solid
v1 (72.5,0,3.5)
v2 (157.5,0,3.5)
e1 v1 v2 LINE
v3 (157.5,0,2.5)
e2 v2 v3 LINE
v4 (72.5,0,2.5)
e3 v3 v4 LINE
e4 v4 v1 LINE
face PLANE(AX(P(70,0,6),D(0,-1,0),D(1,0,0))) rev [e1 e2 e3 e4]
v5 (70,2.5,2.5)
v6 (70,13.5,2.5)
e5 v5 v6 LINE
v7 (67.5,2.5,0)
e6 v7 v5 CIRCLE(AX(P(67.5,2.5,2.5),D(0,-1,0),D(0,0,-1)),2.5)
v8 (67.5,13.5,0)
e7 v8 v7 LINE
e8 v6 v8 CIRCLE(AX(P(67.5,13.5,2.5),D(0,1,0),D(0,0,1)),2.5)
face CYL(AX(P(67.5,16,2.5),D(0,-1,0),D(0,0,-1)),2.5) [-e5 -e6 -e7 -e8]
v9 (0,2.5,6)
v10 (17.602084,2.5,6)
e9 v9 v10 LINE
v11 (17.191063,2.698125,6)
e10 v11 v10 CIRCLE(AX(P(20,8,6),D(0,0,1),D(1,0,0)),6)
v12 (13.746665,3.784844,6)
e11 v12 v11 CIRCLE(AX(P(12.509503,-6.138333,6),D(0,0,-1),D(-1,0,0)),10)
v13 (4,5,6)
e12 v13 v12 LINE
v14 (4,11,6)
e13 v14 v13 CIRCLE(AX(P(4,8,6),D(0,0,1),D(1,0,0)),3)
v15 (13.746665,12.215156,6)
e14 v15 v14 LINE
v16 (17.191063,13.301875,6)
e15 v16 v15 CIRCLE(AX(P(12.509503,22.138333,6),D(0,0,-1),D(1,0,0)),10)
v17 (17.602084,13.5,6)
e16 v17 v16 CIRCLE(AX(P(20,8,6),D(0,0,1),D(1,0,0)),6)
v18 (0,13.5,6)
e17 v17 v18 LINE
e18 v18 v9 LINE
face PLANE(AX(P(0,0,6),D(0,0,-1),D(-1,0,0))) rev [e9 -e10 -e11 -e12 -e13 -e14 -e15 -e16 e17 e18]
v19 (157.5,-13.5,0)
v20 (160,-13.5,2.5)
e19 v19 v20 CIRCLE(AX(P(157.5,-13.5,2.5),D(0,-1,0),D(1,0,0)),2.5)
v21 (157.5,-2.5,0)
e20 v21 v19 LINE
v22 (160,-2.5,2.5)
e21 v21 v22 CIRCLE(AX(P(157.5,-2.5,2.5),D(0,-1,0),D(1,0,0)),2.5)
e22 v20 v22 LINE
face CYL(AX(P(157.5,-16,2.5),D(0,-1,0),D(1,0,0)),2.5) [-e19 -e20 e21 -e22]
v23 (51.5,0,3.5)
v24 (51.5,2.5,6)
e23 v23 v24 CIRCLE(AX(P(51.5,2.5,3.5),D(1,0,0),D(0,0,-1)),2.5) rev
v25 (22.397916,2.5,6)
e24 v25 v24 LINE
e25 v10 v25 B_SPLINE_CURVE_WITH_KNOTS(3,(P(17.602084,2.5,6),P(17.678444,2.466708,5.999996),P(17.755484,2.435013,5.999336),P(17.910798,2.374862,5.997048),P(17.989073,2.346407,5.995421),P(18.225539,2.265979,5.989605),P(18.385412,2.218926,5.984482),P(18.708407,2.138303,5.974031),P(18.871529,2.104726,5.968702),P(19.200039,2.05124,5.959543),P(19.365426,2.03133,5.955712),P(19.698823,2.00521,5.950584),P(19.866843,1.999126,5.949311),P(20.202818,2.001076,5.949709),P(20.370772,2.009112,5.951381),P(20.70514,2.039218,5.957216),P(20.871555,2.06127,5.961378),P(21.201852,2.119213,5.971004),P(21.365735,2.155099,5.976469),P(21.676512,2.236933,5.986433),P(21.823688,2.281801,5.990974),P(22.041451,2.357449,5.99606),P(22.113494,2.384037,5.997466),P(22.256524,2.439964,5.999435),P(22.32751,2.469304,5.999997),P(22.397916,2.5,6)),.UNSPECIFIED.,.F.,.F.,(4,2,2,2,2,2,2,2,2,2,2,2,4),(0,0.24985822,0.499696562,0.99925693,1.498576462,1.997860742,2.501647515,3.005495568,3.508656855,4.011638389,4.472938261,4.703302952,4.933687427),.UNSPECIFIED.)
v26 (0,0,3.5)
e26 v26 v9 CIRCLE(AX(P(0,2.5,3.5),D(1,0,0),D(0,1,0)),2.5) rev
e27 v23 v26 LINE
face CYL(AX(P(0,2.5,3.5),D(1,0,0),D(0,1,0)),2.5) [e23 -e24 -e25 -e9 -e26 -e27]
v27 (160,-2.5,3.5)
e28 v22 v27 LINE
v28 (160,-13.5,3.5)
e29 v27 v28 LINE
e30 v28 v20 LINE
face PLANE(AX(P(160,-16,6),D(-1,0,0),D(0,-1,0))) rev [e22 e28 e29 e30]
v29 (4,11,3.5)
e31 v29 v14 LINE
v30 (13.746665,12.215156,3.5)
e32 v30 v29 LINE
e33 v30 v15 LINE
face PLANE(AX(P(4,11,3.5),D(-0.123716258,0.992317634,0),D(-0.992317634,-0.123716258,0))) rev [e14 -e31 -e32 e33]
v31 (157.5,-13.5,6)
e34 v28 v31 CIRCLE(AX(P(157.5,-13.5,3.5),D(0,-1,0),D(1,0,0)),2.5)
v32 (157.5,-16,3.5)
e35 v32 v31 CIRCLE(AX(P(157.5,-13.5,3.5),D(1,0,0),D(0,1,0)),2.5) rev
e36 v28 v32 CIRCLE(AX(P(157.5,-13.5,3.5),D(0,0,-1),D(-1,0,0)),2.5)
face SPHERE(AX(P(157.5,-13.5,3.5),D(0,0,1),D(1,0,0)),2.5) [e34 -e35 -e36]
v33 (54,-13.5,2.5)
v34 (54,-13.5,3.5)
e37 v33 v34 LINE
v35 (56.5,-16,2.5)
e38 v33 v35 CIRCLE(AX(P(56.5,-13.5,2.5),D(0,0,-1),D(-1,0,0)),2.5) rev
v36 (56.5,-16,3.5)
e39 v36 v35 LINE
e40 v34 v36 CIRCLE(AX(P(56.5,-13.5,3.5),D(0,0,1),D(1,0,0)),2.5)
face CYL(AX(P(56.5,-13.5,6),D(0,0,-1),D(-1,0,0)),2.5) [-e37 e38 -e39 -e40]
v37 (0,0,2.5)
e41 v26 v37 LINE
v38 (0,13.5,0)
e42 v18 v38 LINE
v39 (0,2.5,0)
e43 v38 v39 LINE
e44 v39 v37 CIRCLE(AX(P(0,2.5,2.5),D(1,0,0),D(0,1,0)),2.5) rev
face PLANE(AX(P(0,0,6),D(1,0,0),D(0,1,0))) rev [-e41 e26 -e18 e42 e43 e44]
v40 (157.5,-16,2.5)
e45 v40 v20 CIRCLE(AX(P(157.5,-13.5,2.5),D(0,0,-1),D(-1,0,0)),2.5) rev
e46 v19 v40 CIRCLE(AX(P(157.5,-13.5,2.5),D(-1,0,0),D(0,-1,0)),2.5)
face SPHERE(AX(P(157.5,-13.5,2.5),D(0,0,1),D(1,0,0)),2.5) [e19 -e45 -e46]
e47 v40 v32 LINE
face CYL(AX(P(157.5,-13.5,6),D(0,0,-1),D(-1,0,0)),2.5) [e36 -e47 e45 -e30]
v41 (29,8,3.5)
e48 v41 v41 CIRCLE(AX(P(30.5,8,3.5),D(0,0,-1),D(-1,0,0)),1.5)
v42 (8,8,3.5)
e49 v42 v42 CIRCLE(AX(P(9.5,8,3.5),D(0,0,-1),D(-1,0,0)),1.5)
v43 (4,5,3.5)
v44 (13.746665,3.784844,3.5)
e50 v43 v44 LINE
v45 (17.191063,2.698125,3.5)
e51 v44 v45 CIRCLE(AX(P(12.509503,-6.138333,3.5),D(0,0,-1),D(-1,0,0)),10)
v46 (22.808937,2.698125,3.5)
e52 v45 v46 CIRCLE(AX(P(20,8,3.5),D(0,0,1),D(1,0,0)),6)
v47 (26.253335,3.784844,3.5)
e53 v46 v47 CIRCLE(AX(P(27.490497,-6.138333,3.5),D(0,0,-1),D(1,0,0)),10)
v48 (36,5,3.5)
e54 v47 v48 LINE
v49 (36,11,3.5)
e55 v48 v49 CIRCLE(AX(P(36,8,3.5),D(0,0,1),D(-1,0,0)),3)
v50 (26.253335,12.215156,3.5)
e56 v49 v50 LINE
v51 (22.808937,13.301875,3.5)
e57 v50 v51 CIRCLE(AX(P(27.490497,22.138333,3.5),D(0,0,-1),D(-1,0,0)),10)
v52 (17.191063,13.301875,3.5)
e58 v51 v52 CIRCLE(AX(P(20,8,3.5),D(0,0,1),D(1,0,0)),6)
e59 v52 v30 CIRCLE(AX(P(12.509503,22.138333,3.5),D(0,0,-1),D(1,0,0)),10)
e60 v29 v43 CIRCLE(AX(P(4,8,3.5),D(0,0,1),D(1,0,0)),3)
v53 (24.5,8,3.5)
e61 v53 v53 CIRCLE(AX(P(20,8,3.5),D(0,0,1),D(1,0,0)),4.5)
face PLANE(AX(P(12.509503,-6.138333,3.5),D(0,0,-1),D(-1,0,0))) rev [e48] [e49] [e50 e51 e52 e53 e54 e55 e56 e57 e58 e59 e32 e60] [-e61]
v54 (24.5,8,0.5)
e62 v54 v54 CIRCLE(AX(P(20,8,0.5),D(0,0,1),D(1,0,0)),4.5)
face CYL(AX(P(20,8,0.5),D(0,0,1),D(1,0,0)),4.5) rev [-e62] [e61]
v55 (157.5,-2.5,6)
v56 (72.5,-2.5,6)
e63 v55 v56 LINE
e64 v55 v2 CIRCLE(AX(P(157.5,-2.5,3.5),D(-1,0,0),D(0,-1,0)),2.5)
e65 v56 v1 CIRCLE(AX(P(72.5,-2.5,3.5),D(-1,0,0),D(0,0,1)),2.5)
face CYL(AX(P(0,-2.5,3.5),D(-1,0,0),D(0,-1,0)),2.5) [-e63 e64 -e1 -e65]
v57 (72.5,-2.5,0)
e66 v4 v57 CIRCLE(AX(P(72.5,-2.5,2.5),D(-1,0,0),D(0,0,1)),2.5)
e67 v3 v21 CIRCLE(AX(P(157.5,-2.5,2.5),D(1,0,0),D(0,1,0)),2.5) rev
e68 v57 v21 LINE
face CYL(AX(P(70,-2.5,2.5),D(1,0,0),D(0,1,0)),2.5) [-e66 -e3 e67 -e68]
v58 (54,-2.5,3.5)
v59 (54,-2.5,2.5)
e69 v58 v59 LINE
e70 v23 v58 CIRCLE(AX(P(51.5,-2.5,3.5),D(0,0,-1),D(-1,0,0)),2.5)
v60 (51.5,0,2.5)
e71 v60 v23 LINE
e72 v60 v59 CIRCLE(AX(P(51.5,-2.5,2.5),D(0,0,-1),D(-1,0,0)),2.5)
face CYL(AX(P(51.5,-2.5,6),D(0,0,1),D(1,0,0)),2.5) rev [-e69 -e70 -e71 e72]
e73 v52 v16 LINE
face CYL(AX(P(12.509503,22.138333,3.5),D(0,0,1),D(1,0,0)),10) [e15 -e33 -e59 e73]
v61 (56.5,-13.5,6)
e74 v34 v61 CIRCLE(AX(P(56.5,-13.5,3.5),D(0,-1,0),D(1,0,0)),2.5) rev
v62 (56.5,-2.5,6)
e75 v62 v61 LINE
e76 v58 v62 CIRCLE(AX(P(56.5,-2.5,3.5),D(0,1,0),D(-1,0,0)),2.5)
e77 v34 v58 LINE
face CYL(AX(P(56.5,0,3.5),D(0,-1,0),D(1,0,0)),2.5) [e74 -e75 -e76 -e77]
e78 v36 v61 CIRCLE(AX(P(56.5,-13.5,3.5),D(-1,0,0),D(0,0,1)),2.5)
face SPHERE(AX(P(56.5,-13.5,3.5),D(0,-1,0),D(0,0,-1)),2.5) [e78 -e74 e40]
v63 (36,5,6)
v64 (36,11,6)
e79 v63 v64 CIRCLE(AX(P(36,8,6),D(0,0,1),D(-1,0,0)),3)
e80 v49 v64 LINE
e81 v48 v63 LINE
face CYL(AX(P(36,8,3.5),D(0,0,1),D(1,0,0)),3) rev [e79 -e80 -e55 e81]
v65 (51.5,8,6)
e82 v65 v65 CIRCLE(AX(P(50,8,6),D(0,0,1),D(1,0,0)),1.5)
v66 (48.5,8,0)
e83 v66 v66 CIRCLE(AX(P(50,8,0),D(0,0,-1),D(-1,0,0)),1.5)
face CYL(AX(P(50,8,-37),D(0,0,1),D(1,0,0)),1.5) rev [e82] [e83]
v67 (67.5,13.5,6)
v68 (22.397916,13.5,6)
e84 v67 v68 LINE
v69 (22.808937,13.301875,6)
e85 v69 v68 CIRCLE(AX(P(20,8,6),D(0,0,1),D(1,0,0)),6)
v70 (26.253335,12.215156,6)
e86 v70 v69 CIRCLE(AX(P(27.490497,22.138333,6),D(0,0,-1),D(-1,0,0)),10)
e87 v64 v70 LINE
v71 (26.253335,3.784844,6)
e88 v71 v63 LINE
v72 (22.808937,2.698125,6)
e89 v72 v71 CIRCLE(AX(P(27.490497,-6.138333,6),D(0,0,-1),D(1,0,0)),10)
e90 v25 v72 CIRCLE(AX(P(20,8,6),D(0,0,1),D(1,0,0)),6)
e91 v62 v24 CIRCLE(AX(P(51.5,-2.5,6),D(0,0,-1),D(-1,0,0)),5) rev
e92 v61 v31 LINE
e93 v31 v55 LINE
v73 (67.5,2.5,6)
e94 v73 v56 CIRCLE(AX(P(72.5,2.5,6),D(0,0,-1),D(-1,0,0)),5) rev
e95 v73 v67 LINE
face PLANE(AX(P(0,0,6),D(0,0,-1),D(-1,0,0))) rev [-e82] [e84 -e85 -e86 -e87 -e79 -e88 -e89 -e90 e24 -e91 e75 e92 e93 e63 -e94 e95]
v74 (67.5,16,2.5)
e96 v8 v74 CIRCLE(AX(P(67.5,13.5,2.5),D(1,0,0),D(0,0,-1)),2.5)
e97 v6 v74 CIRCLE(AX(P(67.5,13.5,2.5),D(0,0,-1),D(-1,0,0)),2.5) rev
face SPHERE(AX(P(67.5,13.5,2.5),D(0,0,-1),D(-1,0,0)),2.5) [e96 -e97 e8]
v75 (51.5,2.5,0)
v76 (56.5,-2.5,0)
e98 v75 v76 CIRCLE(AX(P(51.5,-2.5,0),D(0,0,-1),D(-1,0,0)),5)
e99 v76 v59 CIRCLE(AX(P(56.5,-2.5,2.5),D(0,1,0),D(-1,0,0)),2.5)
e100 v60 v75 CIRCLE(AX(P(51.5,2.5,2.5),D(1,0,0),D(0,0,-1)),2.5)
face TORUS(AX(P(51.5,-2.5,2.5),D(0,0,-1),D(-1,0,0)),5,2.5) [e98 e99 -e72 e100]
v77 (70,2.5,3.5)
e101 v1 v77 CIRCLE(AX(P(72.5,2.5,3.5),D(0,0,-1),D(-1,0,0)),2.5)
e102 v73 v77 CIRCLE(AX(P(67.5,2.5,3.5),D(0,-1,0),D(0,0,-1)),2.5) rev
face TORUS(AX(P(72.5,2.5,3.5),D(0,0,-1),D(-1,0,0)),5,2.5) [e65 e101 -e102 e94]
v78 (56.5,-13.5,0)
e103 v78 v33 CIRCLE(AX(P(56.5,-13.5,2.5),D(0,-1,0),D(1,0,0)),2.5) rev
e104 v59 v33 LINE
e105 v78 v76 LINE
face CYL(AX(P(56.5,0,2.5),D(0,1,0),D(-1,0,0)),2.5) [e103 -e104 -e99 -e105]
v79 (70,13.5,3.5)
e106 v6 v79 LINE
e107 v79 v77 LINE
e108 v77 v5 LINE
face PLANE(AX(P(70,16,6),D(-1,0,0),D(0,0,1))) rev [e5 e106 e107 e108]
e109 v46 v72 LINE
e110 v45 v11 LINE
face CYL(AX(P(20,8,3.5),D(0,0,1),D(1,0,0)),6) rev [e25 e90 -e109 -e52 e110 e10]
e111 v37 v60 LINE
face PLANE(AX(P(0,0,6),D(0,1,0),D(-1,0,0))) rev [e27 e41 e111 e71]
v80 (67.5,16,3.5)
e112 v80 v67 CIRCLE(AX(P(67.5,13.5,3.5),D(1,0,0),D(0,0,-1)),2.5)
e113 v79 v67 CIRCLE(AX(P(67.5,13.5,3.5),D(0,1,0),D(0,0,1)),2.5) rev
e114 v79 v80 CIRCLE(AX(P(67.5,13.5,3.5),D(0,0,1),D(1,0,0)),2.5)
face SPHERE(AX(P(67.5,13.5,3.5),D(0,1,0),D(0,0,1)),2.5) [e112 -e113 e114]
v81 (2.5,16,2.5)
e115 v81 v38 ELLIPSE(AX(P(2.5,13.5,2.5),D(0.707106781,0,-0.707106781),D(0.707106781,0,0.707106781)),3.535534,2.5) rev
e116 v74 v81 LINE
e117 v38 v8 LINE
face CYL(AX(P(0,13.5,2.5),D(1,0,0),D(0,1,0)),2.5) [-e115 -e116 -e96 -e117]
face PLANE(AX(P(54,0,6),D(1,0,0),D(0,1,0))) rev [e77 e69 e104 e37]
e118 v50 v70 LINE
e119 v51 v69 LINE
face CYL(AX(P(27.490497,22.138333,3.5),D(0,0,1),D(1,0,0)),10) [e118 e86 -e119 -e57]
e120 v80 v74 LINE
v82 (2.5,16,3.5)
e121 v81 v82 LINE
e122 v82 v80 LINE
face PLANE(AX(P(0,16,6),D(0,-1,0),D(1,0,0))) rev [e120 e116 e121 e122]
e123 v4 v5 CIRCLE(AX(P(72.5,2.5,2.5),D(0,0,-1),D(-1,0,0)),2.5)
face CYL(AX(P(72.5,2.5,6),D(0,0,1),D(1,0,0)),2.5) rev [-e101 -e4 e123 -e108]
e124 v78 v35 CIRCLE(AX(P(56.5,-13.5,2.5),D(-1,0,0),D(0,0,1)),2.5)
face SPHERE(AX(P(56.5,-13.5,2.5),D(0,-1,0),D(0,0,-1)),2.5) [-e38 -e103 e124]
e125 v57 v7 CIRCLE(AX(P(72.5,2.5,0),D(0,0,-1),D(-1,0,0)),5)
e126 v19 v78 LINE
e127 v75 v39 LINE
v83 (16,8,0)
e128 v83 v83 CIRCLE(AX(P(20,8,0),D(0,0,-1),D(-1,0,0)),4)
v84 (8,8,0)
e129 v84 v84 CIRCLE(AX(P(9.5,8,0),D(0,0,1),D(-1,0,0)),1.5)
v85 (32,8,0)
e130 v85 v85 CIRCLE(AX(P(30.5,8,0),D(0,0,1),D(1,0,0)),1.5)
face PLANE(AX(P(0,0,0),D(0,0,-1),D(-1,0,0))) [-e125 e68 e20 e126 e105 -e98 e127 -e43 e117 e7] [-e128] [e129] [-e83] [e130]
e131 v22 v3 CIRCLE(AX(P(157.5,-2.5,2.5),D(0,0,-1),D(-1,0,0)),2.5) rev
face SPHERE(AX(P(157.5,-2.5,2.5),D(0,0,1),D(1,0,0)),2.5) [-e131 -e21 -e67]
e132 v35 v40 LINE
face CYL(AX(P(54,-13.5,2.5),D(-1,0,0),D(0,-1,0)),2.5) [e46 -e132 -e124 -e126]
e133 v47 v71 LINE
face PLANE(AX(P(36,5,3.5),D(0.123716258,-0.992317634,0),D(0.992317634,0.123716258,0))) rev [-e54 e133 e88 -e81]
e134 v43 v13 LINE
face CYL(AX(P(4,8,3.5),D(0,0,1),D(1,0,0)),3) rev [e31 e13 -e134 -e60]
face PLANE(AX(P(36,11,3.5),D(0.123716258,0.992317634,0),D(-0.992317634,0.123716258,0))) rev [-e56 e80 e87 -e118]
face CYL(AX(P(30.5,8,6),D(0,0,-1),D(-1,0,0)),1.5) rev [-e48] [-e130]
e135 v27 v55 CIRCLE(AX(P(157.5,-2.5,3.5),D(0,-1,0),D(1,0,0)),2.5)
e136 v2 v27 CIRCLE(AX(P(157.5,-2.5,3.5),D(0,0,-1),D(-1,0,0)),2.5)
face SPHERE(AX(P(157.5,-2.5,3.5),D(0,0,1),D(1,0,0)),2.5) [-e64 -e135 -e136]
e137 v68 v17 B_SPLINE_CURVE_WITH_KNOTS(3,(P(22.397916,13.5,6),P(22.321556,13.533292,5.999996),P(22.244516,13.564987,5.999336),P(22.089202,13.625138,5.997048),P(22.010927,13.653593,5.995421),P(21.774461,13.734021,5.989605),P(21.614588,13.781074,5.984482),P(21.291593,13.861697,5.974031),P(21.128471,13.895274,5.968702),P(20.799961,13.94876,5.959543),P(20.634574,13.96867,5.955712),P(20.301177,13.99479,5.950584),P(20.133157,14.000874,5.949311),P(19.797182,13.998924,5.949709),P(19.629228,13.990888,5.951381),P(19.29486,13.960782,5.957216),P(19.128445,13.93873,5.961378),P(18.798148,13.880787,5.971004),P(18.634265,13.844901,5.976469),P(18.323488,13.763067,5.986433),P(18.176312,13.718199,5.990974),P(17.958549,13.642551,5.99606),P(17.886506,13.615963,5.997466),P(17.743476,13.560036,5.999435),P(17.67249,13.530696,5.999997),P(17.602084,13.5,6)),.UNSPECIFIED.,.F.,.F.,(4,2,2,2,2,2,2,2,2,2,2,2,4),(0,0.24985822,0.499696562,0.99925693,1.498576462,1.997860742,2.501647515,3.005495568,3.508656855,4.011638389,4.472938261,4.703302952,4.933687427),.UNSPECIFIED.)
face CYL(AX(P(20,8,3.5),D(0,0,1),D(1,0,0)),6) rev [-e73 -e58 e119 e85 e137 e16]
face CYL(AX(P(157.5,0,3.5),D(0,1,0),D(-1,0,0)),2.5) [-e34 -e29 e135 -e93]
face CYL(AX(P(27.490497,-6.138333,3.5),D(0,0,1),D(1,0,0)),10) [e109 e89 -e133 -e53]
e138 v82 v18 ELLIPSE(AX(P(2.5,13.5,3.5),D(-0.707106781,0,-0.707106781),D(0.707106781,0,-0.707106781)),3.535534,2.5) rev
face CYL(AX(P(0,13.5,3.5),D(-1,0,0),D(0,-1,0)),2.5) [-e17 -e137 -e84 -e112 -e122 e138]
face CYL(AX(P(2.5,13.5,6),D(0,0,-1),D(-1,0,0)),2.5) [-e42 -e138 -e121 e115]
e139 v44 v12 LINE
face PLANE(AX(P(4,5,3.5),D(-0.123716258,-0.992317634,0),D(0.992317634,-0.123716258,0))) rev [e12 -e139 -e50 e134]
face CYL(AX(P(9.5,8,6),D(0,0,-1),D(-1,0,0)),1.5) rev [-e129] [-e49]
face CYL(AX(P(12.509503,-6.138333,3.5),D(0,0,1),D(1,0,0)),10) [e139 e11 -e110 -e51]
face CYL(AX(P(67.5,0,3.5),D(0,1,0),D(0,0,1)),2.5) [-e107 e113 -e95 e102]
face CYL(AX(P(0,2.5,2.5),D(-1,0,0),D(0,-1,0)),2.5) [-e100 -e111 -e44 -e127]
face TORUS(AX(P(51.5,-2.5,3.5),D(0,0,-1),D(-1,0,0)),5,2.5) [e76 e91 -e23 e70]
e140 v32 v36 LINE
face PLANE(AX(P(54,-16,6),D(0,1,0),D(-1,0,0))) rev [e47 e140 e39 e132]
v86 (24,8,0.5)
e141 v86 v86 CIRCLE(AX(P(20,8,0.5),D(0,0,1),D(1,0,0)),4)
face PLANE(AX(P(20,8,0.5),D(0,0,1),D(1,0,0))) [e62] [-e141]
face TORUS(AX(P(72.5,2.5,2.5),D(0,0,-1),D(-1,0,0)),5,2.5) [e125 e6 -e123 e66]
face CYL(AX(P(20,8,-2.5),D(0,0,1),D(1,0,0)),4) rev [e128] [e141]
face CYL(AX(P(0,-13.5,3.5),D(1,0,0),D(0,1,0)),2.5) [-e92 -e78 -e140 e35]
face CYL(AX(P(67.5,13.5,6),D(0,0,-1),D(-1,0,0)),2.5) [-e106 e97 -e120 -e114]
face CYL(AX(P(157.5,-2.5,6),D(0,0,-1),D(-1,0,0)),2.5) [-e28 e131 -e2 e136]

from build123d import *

# Parameters (mm, degrees)
SKETCH_1_R          = 1.5
EXTRUDE_1_DEPTH     = 6
CUT_EXTRUDE_3_DEPTH = 2.5
SKETCH_5_R          = 4.5
CUT_EXTRUDE_4_DEPTH = 3
SKETCH_6_R          = 4
CUT_EXTRUDE_5_DEPTH = 3
SKETCH_7_R          = 1.5
CUT_EXTRUDE_6_DEPTH = 43
FILLET_1_R          = 2.5
FILLET_2_R          = 2.5


with BuildPart() as part:
    # Эскиз1 → Бобышка-Вытянуть1 (new body)
    with BuildSketch(Plane.XY):
        Polygon((0, 0), (0, 16), (70, 16), (70, 0), (160, 0), (160, -16), (54, -16), (54, 0), align=None)
        with Locations((20, 8)):
            Circle(SKETCH_1_R, mode=Mode.SUBTRACT)
        with Locations((30.5, 8)):
            Circle(SKETCH_1_R, mode=Mode.SUBTRACT)
        with Locations(Location((9.5, 8, 0), (0, 0, 180))):
            Circle(SKETCH_1_R, mode=Mode.SUBTRACT)
    extrude(amount=EXTRUDE_1_DEPTH)

    # Эскиз4 → Вырез-Вытянуть3 (cut)
    with BuildSketch(Plane.XY.offset(6)):
        with BuildLine():
            Line((4, 11), (13.746665091, 12.215156208))
            ThreePointArc((13.746665091, 12.215156208), (15.51833306, 12.60172211), (17.191063441, 13.301874707))
            ThreePointArc((17.191063441, 13.301874707), (20, 14), (22.808936559, 13.301874707))
            ThreePointArc((22.808936559, 13.301874707), (24.48166694, 12.60172211), (26.253334909, 12.215156208))
            Line((26.253334909, 12.215156208), (36, 11))
            ThreePointArc((36, 11), (39, 8), (36, 5))
            Line((36, 5), (26.253334909, 3.784843792))
            ThreePointArc((26.253334909, 3.784843792), (24.48166694, 3.39827789), (22.808936559, 2.698125293))
            ThreePointArc((22.808936559, 2.698125293), (20, 2), (17.191063441, 2.698125293))
            ThreePointArc((17.191063441, 2.698125293), (15.51833306, 3.39827789), (13.746665091, 3.784843792))
            Line((13.746665091, 3.784843792), (4, 5))
            ThreePointArc((4, 5), (1, 8), (4, 11))
        make_face()
    extrude(amount=-CUT_EXTRUDE_3_DEPTH, mode=Mode.SUBTRACT)

    # Эскиз5 → Вырез-Вытянуть4 (cut)
    with BuildSketch(Plane.XY.offset(3.5)):
        with Locations((20, 8)):
            Circle(SKETCH_5_R)
    extrude(amount=-CUT_EXTRUDE_4_DEPTH, mode=Mode.SUBTRACT)

    # Эскиз6 → Вырез-Вытянуть5 (cut)
    with BuildSketch(Plane.XY.offset(0.5)):
        with Locations((20, 8)):
            Circle(SKETCH_6_R)
    extrude(amount=-CUT_EXTRUDE_5_DEPTH, mode=Mode.SUBTRACT)

    # Эскиз7 → Вырез-Вытянуть6 (cut)
    with BuildSketch(Plane.XY.offset(6)):
        with Locations((50, 8)):
            Circle(SKETCH_7_R)
        with Locations((80, 8)):
            Circle(SKETCH_7_R)
        with Locations((110, 8)):
            Circle(SKETCH_7_R)
        with Locations((140, 8)):
            Circle(SKETCH_7_R)
        with Locations((170, 8)):
            Circle(SKETCH_7_R)
    extrude(amount=-CUT_EXTRUDE_6_DEPTH, mode=Mode.SUBTRACT)

    # Скругление1
    # the kernel refuses this fillet: 2.5 mm, written as the material it adds along each edge
    with BuildSketch(Plane(origin=(70, 0, 0), x_dir=(0, 1, 0), z_dir=(0, 0, 1))) as fillet_1_piece_1:
        with BuildLine():
            CenterArc((FILLET_1_R, -FILLET_1_R), FILLET_1_R, 90, 90)
            Line((0, -FILLET_1_R), (0, 0))
            Line((0, 0), (FILLET_1_R, 0))
        make_face()
    extrude(amount=6)
    with BuildSketch(Plane(origin=(54, 0, 0), x_dir=(-1, 0, 0), z_dir=(0, 0, 1))) as fillet_1_piece_2:
        with BuildLine():
            CenterArc((FILLET_1_R, FILLET_1_R), FILLET_1_R, 180, 90)
            Line((0, FILLET_1_R), (0, 0))
            Line((0, 0), (FILLET_1_R, 0))
        make_face()
    extrude(amount=6)
    # the kernel refuses this fillet: 2.5 mm, written as the material it takes off along each edge
    with BuildSketch(Plane(origin=(56.5, -13.5, 2.5), x_dir=(0, 0, -1), z_dir=(0, -1, 0))) as fillet_1_2_piece_1_section:
        Polygon((0, 0), (FILLET_1_R, 0), (FILLET_1_R, -FILLET_1_R), (0, -FILLET_1_R), align=None)
    fillet_1_2_piece_1 = extrude(amount=FILLET_1_R, mode=Mode.PRIVATE)
    fillet_1_2_piece_1 = fillet_1_2_piece_1 - Plane(origin=(56.5, -13.5, 2.5), x_dir=(0.7071067811865475, 0, 0.7071067811865475), z_dir=(0, -1, 0)) * Sphere(FILLET_1_R, mode=Mode.PRIVATE)
    add(fillet_1_2_piece_1, mode=Mode.SUBTRACT)
    with BuildSketch(Plane(origin=(56.5, -13.5, 3.5), x_dir=(0, 0, 1), z_dir=(0, -1, 0))) as fillet_1_2_piece_2_section:
        Polygon((0, 0), (FILLET_1_R, 0), (FILLET_1_R, FILLET_1_R), (0, FILLET_1_R), align=None)
    fillet_1_2_piece_2 = extrude(amount=FILLET_1_R, mode=Mode.PRIVATE)
    fillet_1_2_piece_2 = fillet_1_2_piece_2 - Plane(origin=(56.5, -13.5, 3.5), x_dir=(0.7071067811865475, 0, -0.7071067811865475), z_dir=(0, -1, 0)) * Sphere(FILLET_1_R, mode=Mode.PRIVATE)
    add(fillet_1_2_piece_2, mode=Mode.SUBTRACT)
    with BuildSketch(Plane(origin=(67.5, 13.5, 2.5), x_dir=(0, 0, -1), z_dir=(0, 1, 0))) as fillet_1_2_piece_3_section:
        Polygon((0, 0), (FILLET_1_R, 0), (FILLET_1_R, -FILLET_1_R), (0, -FILLET_1_R), align=None)
    fillet_1_2_piece_3 = extrude(amount=FILLET_1_R, mode=Mode.PRIVATE)
    fillet_1_2_piece_3 = fillet_1_2_piece_3 - Plane(origin=(67.5, 13.5, 2.5), x_dir=(-0.7071067811865475, 0, 0.7071067811865475), z_dir=(0, 1, 0)) * Sphere(FILLET_1_R, mode=Mode.PRIVATE)
    add(fillet_1_2_piece_3, mode=Mode.SUBTRACT)
    with BuildSketch(Plane(origin=(67.5, 13.5, 3.5), x_dir=(0, 0, 1), z_dir=(0, 1, 0))) as fillet_1_2_piece_4_section:
        Polygon((0, 0), (FILLET_1_R, 0), (FILLET_1_R, FILLET_1_R), (0, FILLET_1_R), align=None)
    fillet_1_2_piece_4 = extrude(amount=FILLET_1_R, mode=Mode.PRIVATE)
    fillet_1_2_piece_4 = fillet_1_2_piece_4 - Plane(origin=(67.5, 13.5, 3.5), x_dir=(-0.7071067811865475, 0, -0.7071067811865475), z_dir=(0, 1, 0)) * Sphere(FILLET_1_R, mode=Mode.PRIVATE)
    add(fillet_1_2_piece_4, mode=Mode.SUBTRACT)
    with BuildSketch(Plane(origin=(166.25, -16, 0), x_dir=(0, 1, 0), z_dir=(-1, 0, 0))) as fillet_1_2_piece_5:
        with BuildLine():
            CenterArc((FILLET_1_R, -FILLET_1_R), FILLET_1_R, 90, 90)
            Line((0, -FILLET_1_R), (0, 0))
            Line((0, 0), (FILLET_1_R, 0))
        make_face()
    extrude(amount=109.75, mode=Mode.SUBTRACT)
    with BuildSketch(Plane(origin=(54, -13.5, 0), x_dir=(1, 0, 0), z_dir=(0, 1, 0)), Plane(origin=(70, 13.5, 0), x_dir=(-1, 0, 0), z_dir=(0, -1, 0))) as fillet_1_2_piece_6:
        with BuildLine():
            CenterArc((FILLET_1_R, -FILLET_1_R), FILLET_1_R, 90, 90)
            Line((0, -FILLET_1_R), (0, 0))
            Line((0, 0), (FILLET_1_R, 0))
        make_face()
    extrude(amount=11, mode=Mode.SUBTRACT)
    with BuildSketch(Plane(origin=(51.5, 0, 0), x_dir=(0, 0, 1), z_dir=(-1, 0, 0))) as fillet_1_2_piece_7:
        with BuildLine():
            CenterArc((FILLET_1_R, FILLET_1_R), FILLET_1_R, 180, 90)
            Line((0, FILLET_1_R), (0, 0))
            Line((0, 0), (FILLET_1_R, 0))
        make_face()
    extrude(amount=57.75, mode=Mode.SUBTRACT)
    with BuildSketch(Plane(origin=(166.25, -16, 6), x_dir=(0, 1, 0), z_dir=(-1, 0, 0))) as fillet_1_2_piece_8:
        with BuildLine():
            CenterArc((FILLET_1_R, FILLET_1_R), FILLET_1_R, 180, 90)
            Line((0, FILLET_1_R), (0, 0))
            Line((0, 0), (FILLET_1_R, 0))
        make_face()
    extrude(amount=109.75, mode=Mode.SUBTRACT)
    with BuildSketch(Plane(origin=(0, 16, -6.25), x_dir=(0, -1, 0), z_dir=(0, 0, 1)), Plane(origin=(160, 0, -6.25), x_dir=(-1, 0, 0), z_dir=(0, 0, 1))) as fillet_1_2_piece_9:
        with BuildLine():
            CenterArc((FILLET_1_R, FILLET_1_R), FILLET_1_R, 180, 90)
            Line((0, FILLET_1_R), (0, 0))
            Line((0, 0), (FILLET_1_R, 0))
        make_face()
    extrude(amount=18.5, mode=Mode.SUBTRACT)
    with BuildSketch(Plane(origin=(70, 16, 2.5), x_dir=(-1, 0, 0), z_dir=(0, 0, 1))) as fillet_1_2_piece_10:
        with BuildLine():
            CenterArc((FILLET_1_R, FILLET_1_R), FILLET_1_R, 180, 90)
            Line((0, FILLET_1_R), (0, 0))
            Line((0, 0), (FILLET_1_R, 0))
        make_face()
    extrude(amount=1, mode=Mode.SUBTRACT)
    with BuildSketch(Plane(origin=(160, -16, -6.25), x_dir=(-1, 0, 0), z_dir=(0, 0, 1))) as fillet_1_2_piece_11:
        with BuildLine():
            CenterArc((FILLET_1_R, -FILLET_1_R), FILLET_1_R, 90, 90)
            Line((0, -FILLET_1_R), (0, 0))
            Line((0, 0), (FILLET_1_R, 0))
        make_face()
    extrude(amount=18.5, mode=Mode.SUBTRACT)
    with BuildSketch(Plane(origin=(54, -16, 2.5), x_dir=(0, 1, 0), z_dir=(0, 0, 1))) as fillet_1_2_piece_12:
        with BuildLine():
            CenterArc((FILLET_1_R, -FILLET_1_R), FILLET_1_R, 90, 90)
            Line((0, -FILLET_1_R), (0, 0))
            Line((0, 0), (FILLET_1_R, 0))
        make_face()
    extrude(amount=1, mode=Mode.SUBTRACT)
    with BuildSketch(Plane(origin=(72.5, 0, 6), x_dir=(0, -1, 0), z_dir=(1, 0, 0))) as fillet_1_2_piece_13:
        with BuildLine():
            CenterArc((FILLET_1_R, FILLET_1_R), FILLET_1_R, 180, 90)
            Line((0, FILLET_1_R), (0, 0))
            Line((0, 0), (FILLET_1_R, 0))
        make_face()
    extrude(amount=93.75, mode=Mode.SUBTRACT)
    with BuildSketch(Plane(origin=(70, 13.5, 6), x_dir=(-1, 0, 0), z_dir=(0, -1, 0)), Plane(origin=(54, -13.5, 6), x_dir=(1, 0, 0), z_dir=(0, 1, 0))) as fillet_1_2_piece_14:
        with BuildLine():
            CenterArc((FILLET_1_R, FILLET_1_R), FILLET_1_R, 180, 90)
            Line((0, FILLET_1_R), (0, 0))
            Line((0, 0), (FILLET_1_R, 0))
        make_face()
    extrude(amount=11, mode=Mode.SUBTRACT)
    with BuildSketch(Plane(origin=(-6.25, 16, 6), x_dir=(0, 0, -1), z_dir=(1, 0, 0))) as fillet_1_2_piece_15:
        with BuildLine():
            CenterArc((FILLET_1_R, -FILLET_1_R), FILLET_1_R, 90, 90)
            Line((0, -FILLET_1_R), (0, 0))
            Line((0, 0), (FILLET_1_R, 0))
        make_face()
    extrude(amount=73.75, mode=Mode.SUBTRACT)
    with BuildSketch(Plane(origin=(51.5, 0, 6), x_dir=(0, 0, -1), z_dir=(-1, 0, 0))) as fillet_1_2_piece_16:
        with BuildLine():
            CenterArc((FILLET_1_R, -FILLET_1_R), FILLET_1_R, 90, 90)
            Line((0, -FILLET_1_R), (0, 0))
            Line((0, 0), (FILLET_1_R, 0))
        make_face()
    extrude(amount=57.75, mode=Mode.SUBTRACT)
    with BuildSketch(Plane(origin=(-6.25, 16, 0), x_dir=(0, 0, 1), z_dir=(1, 0, 0))) as fillet_1_2_piece_17:
        with BuildLine():
            CenterArc((FILLET_1_R, FILLET_1_R), FILLET_1_R, 180, 90)
            Line((0, FILLET_1_R), (0, 0))
            Line((0, 0), (FILLET_1_R, 0))
        make_face()
    extrude(amount=73.75, mode=Mode.SUBTRACT)
    with BuildSketch(Plane(origin=(72.5, 0, 0), x_dir=(0, -1, 0), z_dir=(1, 0, 0))) as fillet_1_2_piece_18:
        with BuildLine():
            CenterArc((FILLET_1_R, -FILLET_1_R), FILLET_1_R, 90, 90)
            Line((0, -FILLET_1_R), (0, 0))
            Line((0, 0), (FILLET_1_R, 0))
        make_face()
    extrude(amount=93.75, mode=Mode.SUBTRACT)
    with BuildSketch(Plane(origin=(72.5, 2.5, 0), x_dir=(-1, 0, 0), z_dir=(0, 1, 0))) as fillet_1_2_piece_19:
        with BuildLine():
            CenterArc((2.5 + FILLET_1_R, FILLET_1_R), FILLET_1_R, 180, 90)
            Line((2.5, FILLET_1_R), (2.5, 0))
            Line((2.5, 0), (2.5 + FILLET_1_R, 0))
        make_face()
    revolve(axis=Axis((72.5, 2.5, 0), (0, 0, 1)), revolution_arc=90, mode=Mode.SUBTRACT)
    with BuildSketch(Plane(origin=(51.5, -2.5, 6), x_dir=(0, 1, 0), z_dir=(-1, 0, 0))) as fillet_1_2_piece_20:
        with BuildLine():
            CenterArc((2.5 + FILLET_1_R, FILLET_1_R), FILLET_1_R, 180, 90)
            Line((2.5, FILLET_1_R), (2.5, 0))
            Line((2.5, 0), (2.5 + FILLET_1_R, 0))
        make_face()
    revolve(axis=Axis((51.5, -2.5, 6), (0, 0, -1)), revolution_arc=90, mode=Mode.SUBTRACT)
    with BuildSketch(Plane(origin=(72.5, 2.5, 6), x_dir=(-1, 0, 0), z_dir=(0, 1, 0))) as fillet_1_2_piece_21:
        with BuildLine():
            CenterArc((2.5 + FILLET_1_R, -FILLET_1_R), FILLET_1_R, 90, 90)
            Line((2.5, -FILLET_1_R), (2.5, 0))
            Line((2.5, 0), (2.5 + FILLET_1_R, 0))
        make_face()
    revolve(axis=Axis((72.5, 2.5, 6), (0, 0, 1)), revolution_arc=90, mode=Mode.SUBTRACT)
    with BuildSketch(Plane(origin=(51.5, -2.5, 0), x_dir=(0, 1, 0), z_dir=(-1, 0, 0))) as fillet_1_2_piece_22:
        with BuildLine():
            CenterArc((2.5 + FILLET_1_R, -FILLET_1_R), FILLET_1_R, 90, 90)
            Line((2.5, -FILLET_1_R), (2.5, 0))
            Line((2.5, 0), (2.5 + FILLET_1_R, 0))
        make_face()
    revolve(axis=Axis((51.5, -2.5, 0), (0, 0, -1)), revolution_arc=90, mode=Mode.SUBTRACT)

    # Скругление2
    # the kernel refuses this fillet: 2.5 mm, written as the material it takes off along each edge
    with BuildSketch(Plane(origin=(157.5, -13.5, 2.5), x_dir=(1, 0, 0), z_dir=(0, 0, -1))) as fillet_2_piece_1_section:
        Polygon((0, 0), (FILLET_2_R, 0), (FILLET_2_R, FILLET_2_R), (0, FILLET_2_R), align=None)
    fillet_2_piece_1 = extrude(amount=FILLET_2_R, mode=Mode.PRIVATE)
    fillet_2_piece_1 = fillet_2_piece_1 - Plane(origin=(157.5, -13.5, 2.5), x_dir=(-0.707106781186548, 0.707106781186547, 0), z_dir=(0, 0, -1)) * Sphere(FILLET_2_R, mode=Mode.PRIVATE)
    add(fillet_2_piece_1, mode=Mode.SUBTRACT)
    with BuildSketch(Plane(origin=(157.5, -13.5, 3.5), x_dir=(1, 0, 0), z_dir=(0, 0, 1))) as fillet_2_piece_2_section:
        Polygon((0, 0), (FILLET_2_R, 0), (FILLET_2_R, -FILLET_2_R), (0, -FILLET_2_R), align=None)
    fillet_2_piece_2 = extrude(amount=FILLET_2_R, mode=Mode.PRIVATE)
    fillet_2_piece_2 = fillet_2_piece_2 - Plane(origin=(157.5, -13.5, 3.5), x_dir=(-0.707106781186548, 0.707106781186547, 0), z_dir=(0, 0, 1)) * Sphere(FILLET_2_R, mode=Mode.PRIVATE)
    add(fillet_2_piece_2, mode=Mode.SUBTRACT)
    with BuildSketch(Plane(origin=(157.5, -2.5, 2.5), x_dir=(1, 0, 0), z_dir=(0, 0, -1))) as fillet_2_piece_3_section:
        Polygon((0, 0), (FILLET_2_R, 0), (FILLET_2_R, -FILLET_2_R), (0, -FILLET_2_R), align=None)
    fillet_2_piece_3 = extrude(amount=FILLET_2_R, mode=Mode.PRIVATE)
    fillet_2_piece_3 = fillet_2_piece_3 - Plane(origin=(157.5, -2.5, 2.5), x_dir=(-0.707106781186547, -0.7071067811865479, 0), z_dir=(0, 0, -1)) * Sphere(FILLET_2_R, mode=Mode.PRIVATE)
    add(fillet_2_piece_3, mode=Mode.SUBTRACT)
    with BuildSketch(Plane(origin=(157.5, -2.5, 3.5), x_dir=(1, 0, 0), z_dir=(0, 0, 1))) as fillet_2_piece_4_section:
        Polygon((0, 0), (FILLET_2_R, 0), (FILLET_2_R, FILLET_2_R), (0, FILLET_2_R), align=None)
    fillet_2_piece_4 = extrude(amount=FILLET_2_R, mode=Mode.PRIVATE)
    fillet_2_piece_4 = fillet_2_piece_4 - Plane(origin=(157.5, -2.5, 3.5), x_dir=(-0.707106781186547, -0.7071067811865479, 0), z_dir=(0, 0, 1)) * Sphere(FILLET_2_R, mode=Mode.PRIVATE)
    add(fillet_2_piece_4, mode=Mode.SUBTRACT)
    with BuildSketch(Plane(origin=(160, -2.5, 6), x_dir=(-1, 0, 0), z_dir=(0, -1, 0))) as fillet_2_piece_5:
        with BuildLine():
            CenterArc((FILLET_2_R, FILLET_2_R), FILLET_2_R, 180, 90)
            Line((0, FILLET_2_R), (0, 0))
            Line((0, 0), (FILLET_2_R, 0))
        make_face()
    extrude(amount=11, mode=Mode.SUBTRACT)
    with BuildSketch(Plane(origin=(160, -2.5, 0), x_dir=(-1, 0, 0), z_dir=(0, -1, 0))) as fillet_2_piece_6:
        with BuildLine():
            CenterArc((FILLET_2_R, -FILLET_2_R), FILLET_2_R, 90, 90)
            Line((0, -FILLET_2_R), (0, 0))
            Line((0, 0), (FILLET_2_R, 0))
        make_face()
    extrude(amount=11, mode=Mode.SUBTRACT)


solid = part.part
